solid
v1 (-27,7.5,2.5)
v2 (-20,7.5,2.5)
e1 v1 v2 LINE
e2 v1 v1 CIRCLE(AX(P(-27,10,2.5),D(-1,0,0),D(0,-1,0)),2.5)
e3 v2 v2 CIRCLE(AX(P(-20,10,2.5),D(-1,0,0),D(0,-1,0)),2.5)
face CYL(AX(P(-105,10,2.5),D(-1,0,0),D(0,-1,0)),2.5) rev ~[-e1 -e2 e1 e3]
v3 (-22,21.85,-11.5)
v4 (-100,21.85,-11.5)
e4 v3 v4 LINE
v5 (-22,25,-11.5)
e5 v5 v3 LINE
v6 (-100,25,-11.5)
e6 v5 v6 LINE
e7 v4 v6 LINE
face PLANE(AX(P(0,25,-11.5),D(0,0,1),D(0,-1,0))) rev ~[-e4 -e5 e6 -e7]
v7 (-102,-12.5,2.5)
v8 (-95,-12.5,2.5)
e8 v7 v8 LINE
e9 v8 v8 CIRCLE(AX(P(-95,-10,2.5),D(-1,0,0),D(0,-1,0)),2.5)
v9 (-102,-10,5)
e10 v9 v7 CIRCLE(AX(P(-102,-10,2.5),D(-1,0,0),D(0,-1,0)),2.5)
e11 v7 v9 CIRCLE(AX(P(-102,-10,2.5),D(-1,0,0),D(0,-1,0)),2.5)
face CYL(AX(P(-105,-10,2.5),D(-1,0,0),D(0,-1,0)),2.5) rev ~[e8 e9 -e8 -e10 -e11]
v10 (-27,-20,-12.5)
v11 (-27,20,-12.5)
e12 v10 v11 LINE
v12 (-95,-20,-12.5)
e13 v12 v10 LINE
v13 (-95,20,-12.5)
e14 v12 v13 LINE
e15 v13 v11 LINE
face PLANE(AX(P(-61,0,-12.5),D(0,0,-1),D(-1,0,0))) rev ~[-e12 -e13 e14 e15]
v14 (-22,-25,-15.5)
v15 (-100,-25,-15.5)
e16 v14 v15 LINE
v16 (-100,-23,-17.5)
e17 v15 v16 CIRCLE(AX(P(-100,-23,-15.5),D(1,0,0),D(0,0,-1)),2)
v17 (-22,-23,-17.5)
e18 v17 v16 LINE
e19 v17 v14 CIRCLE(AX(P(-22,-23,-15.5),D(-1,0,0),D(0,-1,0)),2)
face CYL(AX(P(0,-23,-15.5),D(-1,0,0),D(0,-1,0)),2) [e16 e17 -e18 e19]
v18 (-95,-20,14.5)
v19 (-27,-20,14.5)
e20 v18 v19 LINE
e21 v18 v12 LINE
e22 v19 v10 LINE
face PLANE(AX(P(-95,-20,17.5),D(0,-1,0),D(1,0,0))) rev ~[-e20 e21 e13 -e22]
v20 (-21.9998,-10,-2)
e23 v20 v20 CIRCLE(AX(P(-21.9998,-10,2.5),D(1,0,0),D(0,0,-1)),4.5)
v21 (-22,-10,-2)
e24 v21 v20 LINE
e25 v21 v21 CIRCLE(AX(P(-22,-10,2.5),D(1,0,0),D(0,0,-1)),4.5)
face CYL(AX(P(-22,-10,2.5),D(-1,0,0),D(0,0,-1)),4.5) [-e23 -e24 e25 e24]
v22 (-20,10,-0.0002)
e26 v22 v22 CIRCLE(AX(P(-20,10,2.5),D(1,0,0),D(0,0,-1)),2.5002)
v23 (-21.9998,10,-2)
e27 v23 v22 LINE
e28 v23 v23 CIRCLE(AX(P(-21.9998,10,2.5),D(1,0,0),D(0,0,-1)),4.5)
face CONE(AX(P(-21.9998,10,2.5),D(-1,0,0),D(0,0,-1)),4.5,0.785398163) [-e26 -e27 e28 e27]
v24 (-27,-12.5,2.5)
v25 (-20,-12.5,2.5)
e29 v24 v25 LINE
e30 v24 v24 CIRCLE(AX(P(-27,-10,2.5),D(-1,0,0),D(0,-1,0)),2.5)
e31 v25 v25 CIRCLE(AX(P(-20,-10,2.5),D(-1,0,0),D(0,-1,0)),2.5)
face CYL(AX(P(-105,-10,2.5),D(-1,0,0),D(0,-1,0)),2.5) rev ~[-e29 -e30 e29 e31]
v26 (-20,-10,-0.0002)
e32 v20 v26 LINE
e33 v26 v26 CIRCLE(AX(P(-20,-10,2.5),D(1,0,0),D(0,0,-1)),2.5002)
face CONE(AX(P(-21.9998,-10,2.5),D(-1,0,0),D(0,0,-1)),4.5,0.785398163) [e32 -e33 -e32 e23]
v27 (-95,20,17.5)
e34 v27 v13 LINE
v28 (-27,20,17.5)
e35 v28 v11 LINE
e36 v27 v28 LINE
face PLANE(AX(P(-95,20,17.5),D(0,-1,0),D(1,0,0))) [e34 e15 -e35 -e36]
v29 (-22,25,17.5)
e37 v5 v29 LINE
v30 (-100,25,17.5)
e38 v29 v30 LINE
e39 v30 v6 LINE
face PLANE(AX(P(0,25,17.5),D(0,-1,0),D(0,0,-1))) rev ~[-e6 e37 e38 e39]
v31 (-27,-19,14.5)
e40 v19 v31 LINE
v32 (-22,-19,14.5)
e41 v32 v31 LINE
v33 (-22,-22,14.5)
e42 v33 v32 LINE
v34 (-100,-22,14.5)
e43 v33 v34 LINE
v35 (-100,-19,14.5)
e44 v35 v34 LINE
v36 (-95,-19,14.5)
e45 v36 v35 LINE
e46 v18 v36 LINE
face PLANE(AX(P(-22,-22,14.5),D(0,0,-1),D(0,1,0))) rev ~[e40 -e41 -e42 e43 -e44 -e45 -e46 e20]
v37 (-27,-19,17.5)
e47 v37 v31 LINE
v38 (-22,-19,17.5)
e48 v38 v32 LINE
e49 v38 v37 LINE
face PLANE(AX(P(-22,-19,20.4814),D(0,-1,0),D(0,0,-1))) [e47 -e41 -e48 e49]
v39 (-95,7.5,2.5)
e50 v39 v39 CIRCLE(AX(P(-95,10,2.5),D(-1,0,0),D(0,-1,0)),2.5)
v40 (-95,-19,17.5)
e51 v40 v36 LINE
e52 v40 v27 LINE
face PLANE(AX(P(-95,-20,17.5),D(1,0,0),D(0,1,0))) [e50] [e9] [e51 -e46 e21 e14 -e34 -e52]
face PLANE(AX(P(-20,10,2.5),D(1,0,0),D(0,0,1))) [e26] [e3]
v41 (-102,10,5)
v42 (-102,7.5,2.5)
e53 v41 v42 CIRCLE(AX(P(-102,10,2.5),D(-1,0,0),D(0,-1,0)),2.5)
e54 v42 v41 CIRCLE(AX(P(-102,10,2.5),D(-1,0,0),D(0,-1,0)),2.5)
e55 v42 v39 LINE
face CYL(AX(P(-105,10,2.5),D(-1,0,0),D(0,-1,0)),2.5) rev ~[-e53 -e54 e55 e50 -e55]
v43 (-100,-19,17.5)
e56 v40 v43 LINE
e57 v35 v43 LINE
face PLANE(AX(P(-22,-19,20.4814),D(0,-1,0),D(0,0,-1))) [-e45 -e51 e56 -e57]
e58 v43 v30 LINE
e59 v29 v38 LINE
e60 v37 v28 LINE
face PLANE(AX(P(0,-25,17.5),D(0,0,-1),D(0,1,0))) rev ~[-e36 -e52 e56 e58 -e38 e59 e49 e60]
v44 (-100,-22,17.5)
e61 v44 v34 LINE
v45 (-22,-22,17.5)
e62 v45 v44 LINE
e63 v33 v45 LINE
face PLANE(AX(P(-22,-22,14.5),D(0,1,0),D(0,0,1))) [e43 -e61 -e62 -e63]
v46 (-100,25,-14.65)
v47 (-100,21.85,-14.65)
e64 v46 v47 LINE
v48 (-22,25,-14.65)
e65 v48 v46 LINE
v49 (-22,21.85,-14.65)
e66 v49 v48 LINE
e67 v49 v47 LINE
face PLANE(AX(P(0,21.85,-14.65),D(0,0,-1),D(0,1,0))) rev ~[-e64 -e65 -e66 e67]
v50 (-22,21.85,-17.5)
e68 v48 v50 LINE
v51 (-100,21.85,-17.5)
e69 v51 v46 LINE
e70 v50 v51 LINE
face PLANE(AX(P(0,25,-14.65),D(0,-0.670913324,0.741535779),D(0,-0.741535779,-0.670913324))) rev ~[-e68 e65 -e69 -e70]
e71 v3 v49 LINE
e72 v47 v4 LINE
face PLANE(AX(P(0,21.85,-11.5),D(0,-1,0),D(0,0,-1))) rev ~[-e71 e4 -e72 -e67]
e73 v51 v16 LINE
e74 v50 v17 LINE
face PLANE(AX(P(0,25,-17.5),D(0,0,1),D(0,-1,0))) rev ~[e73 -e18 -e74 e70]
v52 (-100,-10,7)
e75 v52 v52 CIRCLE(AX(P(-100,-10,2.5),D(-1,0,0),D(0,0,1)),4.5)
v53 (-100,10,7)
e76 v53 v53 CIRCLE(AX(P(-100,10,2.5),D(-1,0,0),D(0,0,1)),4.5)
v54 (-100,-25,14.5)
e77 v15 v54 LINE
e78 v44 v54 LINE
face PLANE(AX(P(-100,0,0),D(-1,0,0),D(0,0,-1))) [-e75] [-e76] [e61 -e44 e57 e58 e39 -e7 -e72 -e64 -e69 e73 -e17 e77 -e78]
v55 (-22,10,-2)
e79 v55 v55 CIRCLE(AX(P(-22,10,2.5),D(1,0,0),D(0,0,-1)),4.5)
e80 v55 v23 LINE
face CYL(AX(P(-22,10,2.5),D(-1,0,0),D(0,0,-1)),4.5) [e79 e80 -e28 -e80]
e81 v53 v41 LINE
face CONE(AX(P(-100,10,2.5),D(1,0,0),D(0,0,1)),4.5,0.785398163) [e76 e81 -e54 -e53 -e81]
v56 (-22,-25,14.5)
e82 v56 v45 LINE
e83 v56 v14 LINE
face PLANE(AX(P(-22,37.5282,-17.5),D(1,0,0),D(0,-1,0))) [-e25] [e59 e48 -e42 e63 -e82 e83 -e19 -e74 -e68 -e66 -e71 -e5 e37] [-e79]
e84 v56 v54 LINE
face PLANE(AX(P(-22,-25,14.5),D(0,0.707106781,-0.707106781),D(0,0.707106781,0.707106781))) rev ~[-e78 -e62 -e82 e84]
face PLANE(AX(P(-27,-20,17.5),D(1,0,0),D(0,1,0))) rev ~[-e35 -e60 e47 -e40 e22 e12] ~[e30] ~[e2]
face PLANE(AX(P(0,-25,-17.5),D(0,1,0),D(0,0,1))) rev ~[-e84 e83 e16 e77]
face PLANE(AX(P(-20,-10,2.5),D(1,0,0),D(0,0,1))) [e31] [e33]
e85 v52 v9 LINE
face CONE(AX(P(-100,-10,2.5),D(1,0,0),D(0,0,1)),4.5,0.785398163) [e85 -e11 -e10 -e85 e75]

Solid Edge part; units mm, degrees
sketch "Sketch1" plane through (0, 0, 0) normal (-1, 0, 0) x (0, -1, 0)
  line L0 (25, -17.5) -> (25, 17.5)
  line L1 (25, 17.5) -> (-25, 17.5)
  line L2 (-25, 17.5) -> (-25, -17.5)
  line L3 (-25, -17.5) -> (25, -17.5)
  dimension "D1" = 35
  dimension "D2" = 50
extrude "Protrusion1" add sketch "Sketch1" along normal blind 100
sketch "Sketch2" plane through (-50, 0, 17.5) normal (0, 0, 1) x (0, 1, 0)
  line L0 (20, 45) -> (20, -23)
  line L1 (-20, -23) -> (20, -23)
  line L2 (-20, 45) -> (-20, -23)
  line L3 (-20, 45) -> (20, 45)
  dimension "D1" = 68
  dimension "D2" = 5
  dimension "D3" = 5
extrude "Cutout1" cut sketch "Sketch2" against normal blind 30
fillet "Round_8" radius 2 1 edges at (-50, -25, -17.5)
sketch "Sketch3" plane through (-50, -0.575, -17.5) normal (0, 0, -1) x (0, -1, 0)
  line L0 (-38.1032, -28) -> (40.7023, -28)
  line L1 (40.7023, -54.8488) -> (40.7023, -28)
  line L2 (-38.1032, -54.8488) -> (40.7023, -54.8488)
  line L3 (-38.1032, -28) -> (-38.1032, -54.8488)
  dimension "D1" = 78.8054
  dimension "D2" = 22
  dimension "D3" = 26.8488
  dimension "D4" = 78.8054
extrude "ExtrudedCutout_43" cut sketch "Sketch3" against normal blind 65
sketch "Sketch4" plane through (0, 0, 0) normal (1, 0, 0) x (0, -1, 0)
  line L0 (-25, 11.5) -> (-21.85, 11.5)
  line L1 (-21.85, 11.5) -> (-21.85, 14.65)
  line L2 (-21.85, 14.65) -> (-25, 14.65)
  line L3 (-25, 14.65) -> (-21.85, 17.5)
  line L4 (-21.85, 17.5) -> (-21.85, 20.916)
  line L5 (-21.85, 20.916) -> (-29.169, 20.916)
  line L6 (-29.169, 20.916) -> (-29.169, 11.5)
  line L7 (-29.169, 11.5) -> (-25, 11.5)
  dimension "D1" = 3.15
  dimension "D2" = 3.15
  dimension "D3" = 4.2479
  dimension "D4" = 3.416
  dimension "D5" = 7.319
  dimension "D6" = 9.416
  dimension "D7" = 4.169
extrude "Cutout2" cut sketch "Sketch4" against normal blind 112
sketch "Sketch5" plane through (-100, 0, 0) normal (-1, 0, 0) x (0, 0, 1)
  circle A0 centre (2.5, 10) radius 4.5
  circle A1 centre (2.5, -10) radius 4.5
extrude "ExtrudedProtrusion_35" add sketch "Sketch5" along normal blind 2
sketch "Sketch6" plane through (-22, 0, 0) normal (1, 0, 0) x (0, 0, -1)
  circle A0 centre (-2.5, 10) radius 4.5
  circle A1 centre (-2.5, -10) radius 4.5
extrude "ExtrudedProtrusion_36" add sketch "Sketch6" along normal blind 2
sketch "Sketch7" plane through (-105, 10, 2.5) normal (-1, 0, 0) x (0, -1, 0)
  circle A0 centre (0, 0) radius 2.5
  circle A1 centre (20, 0) radius 2.5
extrude "ExtrudedCutout_41" cut sketch "Sketch7" against normal blind 159
chamfer "Chamfer1" distance 2 angle 45 2 edges at (-20, 10, 7) (-20, -10, 7)
chamfer "Chamfer_23" distance 2 angle 45 2 edges at (-102, -10, -2) (-102, 10, -2)
sketch "Sketch8" plane through (-22, 0, 0) normal (1, 0, 0) x (0, 0, -1)
  line L0 (-14.5, -22) -> (-17.5, -22)
  line L1 (-14.5, -25) -> (-17.5, -22)
  line L2 (-20.4814, -28.0756) -> (-14.5, -25)
  line L3 (-20.4814, -19) -> (-20.4814, -28.0756)
  line L4 (-20.4814, -19) -> (-14.5, -19)
  line L5 (-14.5, -22) -> (-14.5, -19)
  dimension "D1" = 5.9814
  dimension "D2" = 3
  dimension "D3" = 4.2426
  dimension "D4" = 9.0756
  dimension "D5" = 6.7258
extrude "ExtrudedCutout_46" cut sketch "Sketch8" against normal blind 92
